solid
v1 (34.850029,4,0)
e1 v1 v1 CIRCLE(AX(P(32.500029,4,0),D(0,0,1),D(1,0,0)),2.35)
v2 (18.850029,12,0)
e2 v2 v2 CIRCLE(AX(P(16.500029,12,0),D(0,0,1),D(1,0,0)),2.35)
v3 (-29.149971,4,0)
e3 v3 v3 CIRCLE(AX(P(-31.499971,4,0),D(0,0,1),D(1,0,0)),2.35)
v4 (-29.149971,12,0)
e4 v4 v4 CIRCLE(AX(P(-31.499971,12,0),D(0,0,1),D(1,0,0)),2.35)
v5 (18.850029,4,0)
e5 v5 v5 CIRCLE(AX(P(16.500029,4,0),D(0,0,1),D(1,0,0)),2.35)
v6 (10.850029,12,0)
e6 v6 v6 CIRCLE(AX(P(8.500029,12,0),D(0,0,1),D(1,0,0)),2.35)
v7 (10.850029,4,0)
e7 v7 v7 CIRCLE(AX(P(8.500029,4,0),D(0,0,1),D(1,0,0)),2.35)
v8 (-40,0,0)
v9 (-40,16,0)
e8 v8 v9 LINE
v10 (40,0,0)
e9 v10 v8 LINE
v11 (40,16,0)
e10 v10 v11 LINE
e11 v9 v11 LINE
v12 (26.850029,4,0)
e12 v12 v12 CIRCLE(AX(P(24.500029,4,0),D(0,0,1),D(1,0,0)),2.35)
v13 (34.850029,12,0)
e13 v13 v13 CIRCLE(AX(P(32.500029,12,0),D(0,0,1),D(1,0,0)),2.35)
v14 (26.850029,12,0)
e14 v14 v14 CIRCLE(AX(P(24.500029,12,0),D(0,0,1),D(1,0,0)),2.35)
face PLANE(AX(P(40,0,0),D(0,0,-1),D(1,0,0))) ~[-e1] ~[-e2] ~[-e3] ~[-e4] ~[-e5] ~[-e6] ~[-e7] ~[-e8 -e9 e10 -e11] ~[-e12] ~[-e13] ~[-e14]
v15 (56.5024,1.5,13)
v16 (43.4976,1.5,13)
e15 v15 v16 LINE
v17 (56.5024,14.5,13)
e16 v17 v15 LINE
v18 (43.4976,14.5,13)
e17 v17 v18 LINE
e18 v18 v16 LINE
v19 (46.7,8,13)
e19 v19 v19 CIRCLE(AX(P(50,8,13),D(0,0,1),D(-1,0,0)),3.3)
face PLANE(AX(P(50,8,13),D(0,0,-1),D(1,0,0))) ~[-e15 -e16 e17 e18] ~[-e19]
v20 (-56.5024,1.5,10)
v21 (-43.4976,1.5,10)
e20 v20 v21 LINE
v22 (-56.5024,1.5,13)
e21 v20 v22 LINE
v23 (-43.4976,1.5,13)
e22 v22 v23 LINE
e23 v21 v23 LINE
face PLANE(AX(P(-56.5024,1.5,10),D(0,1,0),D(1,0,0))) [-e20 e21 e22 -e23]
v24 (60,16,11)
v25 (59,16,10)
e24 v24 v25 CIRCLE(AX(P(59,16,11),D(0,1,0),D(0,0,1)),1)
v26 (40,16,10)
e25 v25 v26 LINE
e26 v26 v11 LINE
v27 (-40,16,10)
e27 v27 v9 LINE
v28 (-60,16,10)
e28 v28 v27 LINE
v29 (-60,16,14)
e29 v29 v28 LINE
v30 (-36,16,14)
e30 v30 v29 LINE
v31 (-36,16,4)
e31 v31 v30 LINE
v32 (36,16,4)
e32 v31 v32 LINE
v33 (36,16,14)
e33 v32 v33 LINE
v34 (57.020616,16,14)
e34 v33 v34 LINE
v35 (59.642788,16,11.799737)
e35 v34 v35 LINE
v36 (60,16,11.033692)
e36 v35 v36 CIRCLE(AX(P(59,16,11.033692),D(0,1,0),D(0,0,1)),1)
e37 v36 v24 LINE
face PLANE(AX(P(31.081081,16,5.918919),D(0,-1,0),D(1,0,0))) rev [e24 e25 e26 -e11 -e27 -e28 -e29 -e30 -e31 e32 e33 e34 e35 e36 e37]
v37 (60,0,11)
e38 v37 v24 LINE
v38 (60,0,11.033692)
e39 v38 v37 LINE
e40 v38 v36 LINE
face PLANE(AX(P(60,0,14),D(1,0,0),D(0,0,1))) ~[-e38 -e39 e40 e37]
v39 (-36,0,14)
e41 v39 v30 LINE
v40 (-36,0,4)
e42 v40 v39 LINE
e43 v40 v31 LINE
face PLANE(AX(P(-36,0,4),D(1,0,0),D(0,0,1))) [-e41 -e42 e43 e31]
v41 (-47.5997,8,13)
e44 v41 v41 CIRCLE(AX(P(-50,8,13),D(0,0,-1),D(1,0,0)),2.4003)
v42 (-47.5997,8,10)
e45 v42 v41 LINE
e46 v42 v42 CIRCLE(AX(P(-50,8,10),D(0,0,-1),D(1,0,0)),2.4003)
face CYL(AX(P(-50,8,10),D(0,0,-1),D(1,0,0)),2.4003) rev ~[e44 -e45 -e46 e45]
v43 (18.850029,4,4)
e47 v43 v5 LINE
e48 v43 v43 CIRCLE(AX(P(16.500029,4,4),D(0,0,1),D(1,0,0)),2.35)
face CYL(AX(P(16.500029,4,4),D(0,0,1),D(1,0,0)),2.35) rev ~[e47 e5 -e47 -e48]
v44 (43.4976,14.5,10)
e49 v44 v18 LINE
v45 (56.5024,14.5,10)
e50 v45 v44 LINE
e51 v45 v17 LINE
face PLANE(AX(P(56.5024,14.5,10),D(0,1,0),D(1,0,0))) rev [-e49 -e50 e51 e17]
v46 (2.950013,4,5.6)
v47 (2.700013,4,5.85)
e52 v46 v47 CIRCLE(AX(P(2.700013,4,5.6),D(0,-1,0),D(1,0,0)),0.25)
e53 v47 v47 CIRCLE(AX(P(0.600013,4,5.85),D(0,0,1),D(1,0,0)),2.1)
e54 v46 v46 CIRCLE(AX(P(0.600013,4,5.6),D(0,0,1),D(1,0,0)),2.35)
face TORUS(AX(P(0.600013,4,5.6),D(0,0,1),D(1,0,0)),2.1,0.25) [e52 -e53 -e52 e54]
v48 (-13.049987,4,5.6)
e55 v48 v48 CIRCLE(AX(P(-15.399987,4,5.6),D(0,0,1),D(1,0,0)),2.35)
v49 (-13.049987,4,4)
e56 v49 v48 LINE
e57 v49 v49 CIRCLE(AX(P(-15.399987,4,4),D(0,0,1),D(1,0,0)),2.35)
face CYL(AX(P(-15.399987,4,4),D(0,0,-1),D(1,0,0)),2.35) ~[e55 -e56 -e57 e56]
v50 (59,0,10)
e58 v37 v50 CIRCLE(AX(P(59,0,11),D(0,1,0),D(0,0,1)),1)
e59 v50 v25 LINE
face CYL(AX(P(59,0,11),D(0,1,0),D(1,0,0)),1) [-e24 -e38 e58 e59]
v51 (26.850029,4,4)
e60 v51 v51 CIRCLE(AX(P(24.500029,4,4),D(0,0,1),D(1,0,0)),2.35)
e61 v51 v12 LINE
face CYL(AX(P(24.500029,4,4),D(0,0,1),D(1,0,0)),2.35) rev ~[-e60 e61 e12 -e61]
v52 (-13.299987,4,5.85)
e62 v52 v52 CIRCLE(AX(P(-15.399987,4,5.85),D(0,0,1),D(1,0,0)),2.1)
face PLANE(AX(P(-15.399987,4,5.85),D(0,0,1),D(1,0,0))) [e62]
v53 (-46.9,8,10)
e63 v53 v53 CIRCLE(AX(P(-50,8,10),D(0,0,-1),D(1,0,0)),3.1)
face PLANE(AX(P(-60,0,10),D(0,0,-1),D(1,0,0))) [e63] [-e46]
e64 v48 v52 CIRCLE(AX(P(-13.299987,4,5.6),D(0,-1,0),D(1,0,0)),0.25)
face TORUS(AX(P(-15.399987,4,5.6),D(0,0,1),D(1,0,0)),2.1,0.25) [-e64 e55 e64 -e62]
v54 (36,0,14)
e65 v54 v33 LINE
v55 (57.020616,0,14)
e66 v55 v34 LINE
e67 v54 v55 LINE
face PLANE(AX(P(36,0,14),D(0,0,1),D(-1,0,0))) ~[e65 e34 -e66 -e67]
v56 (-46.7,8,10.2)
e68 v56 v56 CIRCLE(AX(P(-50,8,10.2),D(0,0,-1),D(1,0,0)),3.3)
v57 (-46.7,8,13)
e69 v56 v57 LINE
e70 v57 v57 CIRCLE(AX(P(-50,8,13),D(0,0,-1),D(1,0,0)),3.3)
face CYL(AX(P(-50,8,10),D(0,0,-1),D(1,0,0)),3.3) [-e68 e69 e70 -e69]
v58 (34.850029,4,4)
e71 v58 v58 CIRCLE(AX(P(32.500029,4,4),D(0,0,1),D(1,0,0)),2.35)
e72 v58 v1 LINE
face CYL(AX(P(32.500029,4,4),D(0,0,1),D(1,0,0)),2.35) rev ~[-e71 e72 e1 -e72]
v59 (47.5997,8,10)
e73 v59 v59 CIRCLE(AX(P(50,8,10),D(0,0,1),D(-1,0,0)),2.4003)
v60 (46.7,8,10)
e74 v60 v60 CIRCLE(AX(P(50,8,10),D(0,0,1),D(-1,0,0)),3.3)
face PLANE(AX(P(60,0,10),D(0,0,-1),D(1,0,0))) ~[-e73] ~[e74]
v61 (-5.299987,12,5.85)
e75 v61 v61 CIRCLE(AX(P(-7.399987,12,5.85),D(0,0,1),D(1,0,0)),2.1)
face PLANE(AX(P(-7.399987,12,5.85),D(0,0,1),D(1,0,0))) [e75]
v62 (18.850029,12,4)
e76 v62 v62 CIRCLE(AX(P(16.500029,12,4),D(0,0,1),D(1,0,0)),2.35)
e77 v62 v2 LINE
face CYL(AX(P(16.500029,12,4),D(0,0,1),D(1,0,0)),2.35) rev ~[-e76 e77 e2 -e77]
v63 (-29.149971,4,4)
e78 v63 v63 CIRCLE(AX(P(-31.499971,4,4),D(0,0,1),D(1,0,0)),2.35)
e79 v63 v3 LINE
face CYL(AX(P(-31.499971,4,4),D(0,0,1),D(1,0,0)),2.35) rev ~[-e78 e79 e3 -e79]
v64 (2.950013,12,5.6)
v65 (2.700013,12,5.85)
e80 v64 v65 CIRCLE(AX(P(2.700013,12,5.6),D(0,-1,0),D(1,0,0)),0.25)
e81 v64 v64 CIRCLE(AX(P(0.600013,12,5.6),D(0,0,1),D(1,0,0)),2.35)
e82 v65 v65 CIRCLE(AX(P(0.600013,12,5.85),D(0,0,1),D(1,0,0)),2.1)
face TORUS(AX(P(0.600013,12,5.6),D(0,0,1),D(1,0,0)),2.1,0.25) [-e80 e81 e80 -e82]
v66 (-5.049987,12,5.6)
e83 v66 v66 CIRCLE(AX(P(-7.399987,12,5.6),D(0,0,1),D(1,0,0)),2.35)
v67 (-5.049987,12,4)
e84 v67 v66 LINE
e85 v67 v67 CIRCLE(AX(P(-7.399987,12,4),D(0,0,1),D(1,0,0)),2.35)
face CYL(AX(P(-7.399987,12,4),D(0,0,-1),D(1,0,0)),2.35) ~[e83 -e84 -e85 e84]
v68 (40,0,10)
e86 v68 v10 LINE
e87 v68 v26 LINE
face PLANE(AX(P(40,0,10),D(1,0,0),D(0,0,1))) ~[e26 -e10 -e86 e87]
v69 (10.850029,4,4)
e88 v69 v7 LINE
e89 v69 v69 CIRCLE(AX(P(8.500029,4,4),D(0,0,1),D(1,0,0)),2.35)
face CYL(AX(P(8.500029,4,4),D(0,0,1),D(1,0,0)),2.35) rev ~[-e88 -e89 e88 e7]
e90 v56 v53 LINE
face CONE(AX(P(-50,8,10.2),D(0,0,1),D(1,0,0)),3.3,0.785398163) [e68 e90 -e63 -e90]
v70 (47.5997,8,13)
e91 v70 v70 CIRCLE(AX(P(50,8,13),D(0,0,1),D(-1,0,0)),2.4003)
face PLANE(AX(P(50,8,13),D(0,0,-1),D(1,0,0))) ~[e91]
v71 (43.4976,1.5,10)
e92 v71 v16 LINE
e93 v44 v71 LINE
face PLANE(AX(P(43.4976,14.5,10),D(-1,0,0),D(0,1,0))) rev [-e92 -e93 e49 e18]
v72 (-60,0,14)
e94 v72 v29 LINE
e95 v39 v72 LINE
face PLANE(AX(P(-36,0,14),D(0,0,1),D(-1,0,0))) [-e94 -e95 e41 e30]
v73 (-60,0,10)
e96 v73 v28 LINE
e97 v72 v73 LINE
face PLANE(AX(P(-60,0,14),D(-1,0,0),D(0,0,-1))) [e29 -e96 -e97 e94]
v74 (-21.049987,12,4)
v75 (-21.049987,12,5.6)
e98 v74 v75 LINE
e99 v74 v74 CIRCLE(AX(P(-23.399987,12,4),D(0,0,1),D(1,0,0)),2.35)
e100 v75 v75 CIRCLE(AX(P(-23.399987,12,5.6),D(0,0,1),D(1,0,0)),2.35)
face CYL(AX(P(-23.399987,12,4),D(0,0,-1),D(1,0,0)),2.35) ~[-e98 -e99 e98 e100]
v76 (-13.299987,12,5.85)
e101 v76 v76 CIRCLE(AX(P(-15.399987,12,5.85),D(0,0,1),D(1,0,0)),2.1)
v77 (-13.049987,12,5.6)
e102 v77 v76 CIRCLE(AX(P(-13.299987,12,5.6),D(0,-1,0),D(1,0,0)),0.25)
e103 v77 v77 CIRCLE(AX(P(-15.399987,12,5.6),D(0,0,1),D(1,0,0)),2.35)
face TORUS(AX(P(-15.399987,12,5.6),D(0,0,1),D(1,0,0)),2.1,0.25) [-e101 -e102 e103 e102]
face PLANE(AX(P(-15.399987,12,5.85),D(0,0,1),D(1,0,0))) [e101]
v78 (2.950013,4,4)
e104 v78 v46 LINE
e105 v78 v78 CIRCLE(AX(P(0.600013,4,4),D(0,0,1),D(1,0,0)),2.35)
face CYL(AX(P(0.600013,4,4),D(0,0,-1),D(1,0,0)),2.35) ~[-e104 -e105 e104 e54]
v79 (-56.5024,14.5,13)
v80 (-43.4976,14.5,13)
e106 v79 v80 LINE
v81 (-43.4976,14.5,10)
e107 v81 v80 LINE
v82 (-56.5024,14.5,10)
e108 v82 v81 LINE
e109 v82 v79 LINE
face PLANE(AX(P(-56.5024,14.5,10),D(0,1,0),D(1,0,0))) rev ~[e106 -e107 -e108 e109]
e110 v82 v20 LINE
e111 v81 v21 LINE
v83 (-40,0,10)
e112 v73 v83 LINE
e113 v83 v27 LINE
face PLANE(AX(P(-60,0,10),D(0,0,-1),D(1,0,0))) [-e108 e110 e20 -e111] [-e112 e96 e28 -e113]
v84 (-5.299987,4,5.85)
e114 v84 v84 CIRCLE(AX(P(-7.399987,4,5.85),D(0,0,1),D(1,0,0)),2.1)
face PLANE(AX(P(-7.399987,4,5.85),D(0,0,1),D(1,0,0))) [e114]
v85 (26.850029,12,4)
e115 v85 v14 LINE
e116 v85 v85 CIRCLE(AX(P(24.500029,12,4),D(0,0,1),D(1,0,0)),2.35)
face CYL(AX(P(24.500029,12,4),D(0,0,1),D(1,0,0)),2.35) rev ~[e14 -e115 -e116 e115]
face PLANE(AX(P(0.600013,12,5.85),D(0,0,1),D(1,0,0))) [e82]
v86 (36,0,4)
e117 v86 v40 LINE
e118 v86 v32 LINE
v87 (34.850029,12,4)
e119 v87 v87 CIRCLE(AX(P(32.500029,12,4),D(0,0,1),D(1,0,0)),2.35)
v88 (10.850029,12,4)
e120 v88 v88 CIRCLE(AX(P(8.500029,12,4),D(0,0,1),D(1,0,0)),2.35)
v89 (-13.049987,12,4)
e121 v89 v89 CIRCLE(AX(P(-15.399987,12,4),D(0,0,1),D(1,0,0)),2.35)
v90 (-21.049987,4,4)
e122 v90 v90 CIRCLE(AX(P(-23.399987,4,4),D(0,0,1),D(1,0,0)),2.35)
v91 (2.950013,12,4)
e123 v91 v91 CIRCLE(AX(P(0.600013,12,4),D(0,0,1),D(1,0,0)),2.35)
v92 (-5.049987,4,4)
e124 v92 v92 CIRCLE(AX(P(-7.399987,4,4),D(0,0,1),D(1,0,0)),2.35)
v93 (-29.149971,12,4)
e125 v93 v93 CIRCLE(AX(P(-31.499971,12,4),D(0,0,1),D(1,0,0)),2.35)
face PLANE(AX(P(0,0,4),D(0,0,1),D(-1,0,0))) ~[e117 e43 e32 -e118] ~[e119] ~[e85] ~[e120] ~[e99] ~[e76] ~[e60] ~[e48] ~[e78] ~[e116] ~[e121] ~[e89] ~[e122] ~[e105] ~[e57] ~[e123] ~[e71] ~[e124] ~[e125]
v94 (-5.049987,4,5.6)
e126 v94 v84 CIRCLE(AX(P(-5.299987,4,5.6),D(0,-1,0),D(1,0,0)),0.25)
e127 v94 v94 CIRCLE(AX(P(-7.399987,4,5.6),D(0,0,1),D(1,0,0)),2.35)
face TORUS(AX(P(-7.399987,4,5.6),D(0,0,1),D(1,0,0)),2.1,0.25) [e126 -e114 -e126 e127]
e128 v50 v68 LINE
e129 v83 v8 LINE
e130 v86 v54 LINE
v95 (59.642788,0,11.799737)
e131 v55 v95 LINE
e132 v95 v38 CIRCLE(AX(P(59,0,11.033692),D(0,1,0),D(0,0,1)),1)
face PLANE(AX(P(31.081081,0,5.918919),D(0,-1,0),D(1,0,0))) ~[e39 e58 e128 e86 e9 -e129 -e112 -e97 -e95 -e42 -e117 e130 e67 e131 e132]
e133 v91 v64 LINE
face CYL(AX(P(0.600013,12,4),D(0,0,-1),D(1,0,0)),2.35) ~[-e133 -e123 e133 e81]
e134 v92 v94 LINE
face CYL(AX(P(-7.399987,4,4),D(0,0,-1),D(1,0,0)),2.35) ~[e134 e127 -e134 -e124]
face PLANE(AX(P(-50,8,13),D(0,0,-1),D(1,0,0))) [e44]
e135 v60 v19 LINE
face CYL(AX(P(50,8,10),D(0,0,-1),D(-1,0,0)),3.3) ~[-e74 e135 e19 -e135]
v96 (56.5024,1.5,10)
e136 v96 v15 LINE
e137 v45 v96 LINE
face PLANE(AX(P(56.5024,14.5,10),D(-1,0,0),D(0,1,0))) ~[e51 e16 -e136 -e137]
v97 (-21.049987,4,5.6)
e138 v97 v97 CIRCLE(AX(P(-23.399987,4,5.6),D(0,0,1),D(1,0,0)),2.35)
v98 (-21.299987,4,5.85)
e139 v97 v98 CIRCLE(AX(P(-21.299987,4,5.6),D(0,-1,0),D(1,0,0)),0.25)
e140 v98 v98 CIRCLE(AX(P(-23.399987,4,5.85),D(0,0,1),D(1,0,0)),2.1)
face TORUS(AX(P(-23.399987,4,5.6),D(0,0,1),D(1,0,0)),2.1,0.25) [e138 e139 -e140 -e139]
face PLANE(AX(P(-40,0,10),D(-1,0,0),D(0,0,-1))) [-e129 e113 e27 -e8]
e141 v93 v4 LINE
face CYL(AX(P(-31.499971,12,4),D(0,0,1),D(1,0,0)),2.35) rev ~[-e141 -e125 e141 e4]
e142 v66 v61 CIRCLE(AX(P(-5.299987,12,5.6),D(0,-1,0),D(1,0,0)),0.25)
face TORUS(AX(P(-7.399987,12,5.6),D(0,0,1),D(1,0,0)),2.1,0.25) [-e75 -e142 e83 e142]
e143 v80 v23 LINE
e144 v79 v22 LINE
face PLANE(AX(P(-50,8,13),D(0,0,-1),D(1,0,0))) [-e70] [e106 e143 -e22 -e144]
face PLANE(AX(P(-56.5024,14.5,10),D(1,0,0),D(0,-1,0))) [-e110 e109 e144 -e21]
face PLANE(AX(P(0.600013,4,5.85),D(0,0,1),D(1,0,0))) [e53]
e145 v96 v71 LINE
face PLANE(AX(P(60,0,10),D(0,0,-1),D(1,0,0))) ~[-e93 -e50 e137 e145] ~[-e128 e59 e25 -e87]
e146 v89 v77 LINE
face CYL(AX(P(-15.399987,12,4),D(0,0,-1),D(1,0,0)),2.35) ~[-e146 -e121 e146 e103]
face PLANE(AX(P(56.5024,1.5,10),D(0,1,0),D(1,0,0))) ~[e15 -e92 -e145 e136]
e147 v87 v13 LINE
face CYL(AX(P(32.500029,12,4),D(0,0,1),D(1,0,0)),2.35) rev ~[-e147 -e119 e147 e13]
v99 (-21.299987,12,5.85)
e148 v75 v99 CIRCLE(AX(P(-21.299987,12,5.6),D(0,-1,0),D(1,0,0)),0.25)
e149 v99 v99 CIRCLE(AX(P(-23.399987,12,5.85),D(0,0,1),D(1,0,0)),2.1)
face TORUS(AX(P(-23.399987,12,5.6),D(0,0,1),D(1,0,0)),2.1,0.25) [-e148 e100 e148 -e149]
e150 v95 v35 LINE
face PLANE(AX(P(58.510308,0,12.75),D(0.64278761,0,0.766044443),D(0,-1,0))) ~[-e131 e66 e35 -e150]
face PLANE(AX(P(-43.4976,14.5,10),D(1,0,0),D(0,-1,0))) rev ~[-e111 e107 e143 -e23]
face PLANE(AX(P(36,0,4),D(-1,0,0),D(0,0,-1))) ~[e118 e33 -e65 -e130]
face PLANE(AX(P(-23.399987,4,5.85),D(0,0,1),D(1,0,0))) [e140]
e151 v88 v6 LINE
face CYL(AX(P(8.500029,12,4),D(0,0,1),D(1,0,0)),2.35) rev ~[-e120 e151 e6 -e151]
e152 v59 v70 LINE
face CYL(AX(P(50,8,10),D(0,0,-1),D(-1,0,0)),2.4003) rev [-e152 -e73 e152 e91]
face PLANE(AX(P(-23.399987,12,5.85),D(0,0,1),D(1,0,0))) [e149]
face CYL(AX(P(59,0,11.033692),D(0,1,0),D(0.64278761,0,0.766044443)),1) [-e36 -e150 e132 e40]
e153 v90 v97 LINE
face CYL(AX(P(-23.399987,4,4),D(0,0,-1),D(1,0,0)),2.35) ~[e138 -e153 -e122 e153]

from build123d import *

# Parameters (mm, degrees)
F1_DEPTH  = 16
F2_W      = 13.0048
F2_H      = 13
F2_R      = 3.3
F2_R_2    = 2.4003
F3_DEPTH  = 3
F5_R      = 2.35
F6_DEPTH  = 1.85
F7_SIZE2  = 2.5
F7_SIZE   = 2.9793839815
F8_R      = 0.25
F9_SIZE   = 0.2
F10_R     = 1
F11_R     = 2.35
F12_DEPTH = 25


# Not quite as in the source:
# - a feature names something its author has since deleted; it is built from what else it names


with BuildPart() as f1:
    # F0 (on Front) → F1 (new body)
    with BuildSketch(Plane.XZ):
        Polygon((-40, 0), (0, 0), (0, 4), (-36, 4), (-36, 14), (-60, 14), (-60, 10), (-40, 10), align=None)
    extrude(amount=-F1_DEPTH)

    # F2 (on face) → F3 (cut)
    with BuildSketch(Plane(origin=(0, 0, 10), x_dir=(1, 0, 0), z_dir=(0, 0, -1))):
        with Locations((-50, -8)):
            Rectangle(F2_W, F2_H)
        with Locations((-50, -8)):
            Circle(F2_R, mode=Mode.SUBTRACT)
        with Locations((-50, -8)):
            Circle(F2_R_2)
    extrude(amount=-F3_DEPTH, mode=Mode.SUBTRACT)

    # F4: F1 across face


with BuildPart() as f1_1:
    add(f1.part)
    add(f1.part.mirror(Plane(origin=(0, 8, 2), x_dir=(0, 1, 0), z_dir=(1, 0, 0))))

    # F5 (on face) → F6 (join)
    with BuildSketch(Plane.XY.offset(4)):
        with Locations((-23.3999874801, 4)):
            Circle(F5_R)
        with Locations((-23.3999874801, 12)):
            Circle(F5_R)
        with Locations((-15.3999874801, 12)):
            Circle(F5_R)
        with Locations((-15.3999874801, 4)):
            Circle(F5_R)
        with Locations((-7.3999874801, 4)):
            Circle(F5_R)
        with Locations((-7.3999874801, 12)):
            Circle(F5_R)
        with Locations((0.6000125199, 12)):
            Circle(F5_R)
        with Locations((0.6000125199, 4)):
            Circle(F5_R)
    extrude(amount=F6_DEPTH)

    # F7
    f7_edges = [f1_1.edges().sort_by_distance(p)[0] for p in [
        (60, 8, 14),
    ]]
    f7_side = f1_1.faces().sort_by_distance((48, 8, 14))[0]
    chamfer(f7_edges, length=F7_SIZE, length2=F7_SIZE2, reference=f7_side)

    # F8
    f8_edges = [f1_1.edges().sort_by_distance(p)[0] for p in [
        (-25.749987, 4, 5.85),
        (-25.749987, 12, 5.85),
        (-17.749987, 12, 5.85),
        (-17.749987, 4, 5.85),
        (-9.749987, 4, 5.85),
        (-9.749987, 12, 5.85),
        (-1.749987, 12, 5.85),
        (-1.749987, 4, 5.85),
    ]]
    fillet(f8_edges, radius=F8_R)

    # F9
    f9_edges = [f1_1.edges().sort_by_distance(p)[0] for p in [
        (-53.3, 8, 10),
    ]]
    chamfer(f9_edges, length=F9_SIZE)

    # F10
    f10_edges = [f1_1.edges().sort_by_distance(p)[0] for p in [
        (60, 8, 11.5),
        (60, 8, 10),
    ]]
    fillet(f10_edges, radius=F10_R)

    # F11 (on face) → F12 (cut)
    with BuildSketch(Plane.XY.offset(4)):
        with Locations((-31.4999707043, 4)):
            Circle(F11_R)
        with Locations((-31.4999707043, 12)):
            Circle(F11_R)
        with Locations((8.5000292957, 12)):
            Circle(F11_R)
        with Locations((8.5000292957, 4)):
            Circle(F11_R)
        with Locations((16.5000292957, 4)):
            Circle(F11_R)
        with Locations((16.5000292957, 12)):
            Circle(F11_R)
        with Locations((24.5000292957, 12)):
            Circle(F11_R)
        with Locations((24.5000292957, 4)):
            Circle(F11_R)
        with Locations((32.5000292957, 4)):
            Circle(F11_R)
        with Locations((32.5000292957, 12)):
            Circle(F11_R)
    extrude(amount=-F12_DEPTH, mode=Mode.SUBTRACT)


solid = f1_1.part
